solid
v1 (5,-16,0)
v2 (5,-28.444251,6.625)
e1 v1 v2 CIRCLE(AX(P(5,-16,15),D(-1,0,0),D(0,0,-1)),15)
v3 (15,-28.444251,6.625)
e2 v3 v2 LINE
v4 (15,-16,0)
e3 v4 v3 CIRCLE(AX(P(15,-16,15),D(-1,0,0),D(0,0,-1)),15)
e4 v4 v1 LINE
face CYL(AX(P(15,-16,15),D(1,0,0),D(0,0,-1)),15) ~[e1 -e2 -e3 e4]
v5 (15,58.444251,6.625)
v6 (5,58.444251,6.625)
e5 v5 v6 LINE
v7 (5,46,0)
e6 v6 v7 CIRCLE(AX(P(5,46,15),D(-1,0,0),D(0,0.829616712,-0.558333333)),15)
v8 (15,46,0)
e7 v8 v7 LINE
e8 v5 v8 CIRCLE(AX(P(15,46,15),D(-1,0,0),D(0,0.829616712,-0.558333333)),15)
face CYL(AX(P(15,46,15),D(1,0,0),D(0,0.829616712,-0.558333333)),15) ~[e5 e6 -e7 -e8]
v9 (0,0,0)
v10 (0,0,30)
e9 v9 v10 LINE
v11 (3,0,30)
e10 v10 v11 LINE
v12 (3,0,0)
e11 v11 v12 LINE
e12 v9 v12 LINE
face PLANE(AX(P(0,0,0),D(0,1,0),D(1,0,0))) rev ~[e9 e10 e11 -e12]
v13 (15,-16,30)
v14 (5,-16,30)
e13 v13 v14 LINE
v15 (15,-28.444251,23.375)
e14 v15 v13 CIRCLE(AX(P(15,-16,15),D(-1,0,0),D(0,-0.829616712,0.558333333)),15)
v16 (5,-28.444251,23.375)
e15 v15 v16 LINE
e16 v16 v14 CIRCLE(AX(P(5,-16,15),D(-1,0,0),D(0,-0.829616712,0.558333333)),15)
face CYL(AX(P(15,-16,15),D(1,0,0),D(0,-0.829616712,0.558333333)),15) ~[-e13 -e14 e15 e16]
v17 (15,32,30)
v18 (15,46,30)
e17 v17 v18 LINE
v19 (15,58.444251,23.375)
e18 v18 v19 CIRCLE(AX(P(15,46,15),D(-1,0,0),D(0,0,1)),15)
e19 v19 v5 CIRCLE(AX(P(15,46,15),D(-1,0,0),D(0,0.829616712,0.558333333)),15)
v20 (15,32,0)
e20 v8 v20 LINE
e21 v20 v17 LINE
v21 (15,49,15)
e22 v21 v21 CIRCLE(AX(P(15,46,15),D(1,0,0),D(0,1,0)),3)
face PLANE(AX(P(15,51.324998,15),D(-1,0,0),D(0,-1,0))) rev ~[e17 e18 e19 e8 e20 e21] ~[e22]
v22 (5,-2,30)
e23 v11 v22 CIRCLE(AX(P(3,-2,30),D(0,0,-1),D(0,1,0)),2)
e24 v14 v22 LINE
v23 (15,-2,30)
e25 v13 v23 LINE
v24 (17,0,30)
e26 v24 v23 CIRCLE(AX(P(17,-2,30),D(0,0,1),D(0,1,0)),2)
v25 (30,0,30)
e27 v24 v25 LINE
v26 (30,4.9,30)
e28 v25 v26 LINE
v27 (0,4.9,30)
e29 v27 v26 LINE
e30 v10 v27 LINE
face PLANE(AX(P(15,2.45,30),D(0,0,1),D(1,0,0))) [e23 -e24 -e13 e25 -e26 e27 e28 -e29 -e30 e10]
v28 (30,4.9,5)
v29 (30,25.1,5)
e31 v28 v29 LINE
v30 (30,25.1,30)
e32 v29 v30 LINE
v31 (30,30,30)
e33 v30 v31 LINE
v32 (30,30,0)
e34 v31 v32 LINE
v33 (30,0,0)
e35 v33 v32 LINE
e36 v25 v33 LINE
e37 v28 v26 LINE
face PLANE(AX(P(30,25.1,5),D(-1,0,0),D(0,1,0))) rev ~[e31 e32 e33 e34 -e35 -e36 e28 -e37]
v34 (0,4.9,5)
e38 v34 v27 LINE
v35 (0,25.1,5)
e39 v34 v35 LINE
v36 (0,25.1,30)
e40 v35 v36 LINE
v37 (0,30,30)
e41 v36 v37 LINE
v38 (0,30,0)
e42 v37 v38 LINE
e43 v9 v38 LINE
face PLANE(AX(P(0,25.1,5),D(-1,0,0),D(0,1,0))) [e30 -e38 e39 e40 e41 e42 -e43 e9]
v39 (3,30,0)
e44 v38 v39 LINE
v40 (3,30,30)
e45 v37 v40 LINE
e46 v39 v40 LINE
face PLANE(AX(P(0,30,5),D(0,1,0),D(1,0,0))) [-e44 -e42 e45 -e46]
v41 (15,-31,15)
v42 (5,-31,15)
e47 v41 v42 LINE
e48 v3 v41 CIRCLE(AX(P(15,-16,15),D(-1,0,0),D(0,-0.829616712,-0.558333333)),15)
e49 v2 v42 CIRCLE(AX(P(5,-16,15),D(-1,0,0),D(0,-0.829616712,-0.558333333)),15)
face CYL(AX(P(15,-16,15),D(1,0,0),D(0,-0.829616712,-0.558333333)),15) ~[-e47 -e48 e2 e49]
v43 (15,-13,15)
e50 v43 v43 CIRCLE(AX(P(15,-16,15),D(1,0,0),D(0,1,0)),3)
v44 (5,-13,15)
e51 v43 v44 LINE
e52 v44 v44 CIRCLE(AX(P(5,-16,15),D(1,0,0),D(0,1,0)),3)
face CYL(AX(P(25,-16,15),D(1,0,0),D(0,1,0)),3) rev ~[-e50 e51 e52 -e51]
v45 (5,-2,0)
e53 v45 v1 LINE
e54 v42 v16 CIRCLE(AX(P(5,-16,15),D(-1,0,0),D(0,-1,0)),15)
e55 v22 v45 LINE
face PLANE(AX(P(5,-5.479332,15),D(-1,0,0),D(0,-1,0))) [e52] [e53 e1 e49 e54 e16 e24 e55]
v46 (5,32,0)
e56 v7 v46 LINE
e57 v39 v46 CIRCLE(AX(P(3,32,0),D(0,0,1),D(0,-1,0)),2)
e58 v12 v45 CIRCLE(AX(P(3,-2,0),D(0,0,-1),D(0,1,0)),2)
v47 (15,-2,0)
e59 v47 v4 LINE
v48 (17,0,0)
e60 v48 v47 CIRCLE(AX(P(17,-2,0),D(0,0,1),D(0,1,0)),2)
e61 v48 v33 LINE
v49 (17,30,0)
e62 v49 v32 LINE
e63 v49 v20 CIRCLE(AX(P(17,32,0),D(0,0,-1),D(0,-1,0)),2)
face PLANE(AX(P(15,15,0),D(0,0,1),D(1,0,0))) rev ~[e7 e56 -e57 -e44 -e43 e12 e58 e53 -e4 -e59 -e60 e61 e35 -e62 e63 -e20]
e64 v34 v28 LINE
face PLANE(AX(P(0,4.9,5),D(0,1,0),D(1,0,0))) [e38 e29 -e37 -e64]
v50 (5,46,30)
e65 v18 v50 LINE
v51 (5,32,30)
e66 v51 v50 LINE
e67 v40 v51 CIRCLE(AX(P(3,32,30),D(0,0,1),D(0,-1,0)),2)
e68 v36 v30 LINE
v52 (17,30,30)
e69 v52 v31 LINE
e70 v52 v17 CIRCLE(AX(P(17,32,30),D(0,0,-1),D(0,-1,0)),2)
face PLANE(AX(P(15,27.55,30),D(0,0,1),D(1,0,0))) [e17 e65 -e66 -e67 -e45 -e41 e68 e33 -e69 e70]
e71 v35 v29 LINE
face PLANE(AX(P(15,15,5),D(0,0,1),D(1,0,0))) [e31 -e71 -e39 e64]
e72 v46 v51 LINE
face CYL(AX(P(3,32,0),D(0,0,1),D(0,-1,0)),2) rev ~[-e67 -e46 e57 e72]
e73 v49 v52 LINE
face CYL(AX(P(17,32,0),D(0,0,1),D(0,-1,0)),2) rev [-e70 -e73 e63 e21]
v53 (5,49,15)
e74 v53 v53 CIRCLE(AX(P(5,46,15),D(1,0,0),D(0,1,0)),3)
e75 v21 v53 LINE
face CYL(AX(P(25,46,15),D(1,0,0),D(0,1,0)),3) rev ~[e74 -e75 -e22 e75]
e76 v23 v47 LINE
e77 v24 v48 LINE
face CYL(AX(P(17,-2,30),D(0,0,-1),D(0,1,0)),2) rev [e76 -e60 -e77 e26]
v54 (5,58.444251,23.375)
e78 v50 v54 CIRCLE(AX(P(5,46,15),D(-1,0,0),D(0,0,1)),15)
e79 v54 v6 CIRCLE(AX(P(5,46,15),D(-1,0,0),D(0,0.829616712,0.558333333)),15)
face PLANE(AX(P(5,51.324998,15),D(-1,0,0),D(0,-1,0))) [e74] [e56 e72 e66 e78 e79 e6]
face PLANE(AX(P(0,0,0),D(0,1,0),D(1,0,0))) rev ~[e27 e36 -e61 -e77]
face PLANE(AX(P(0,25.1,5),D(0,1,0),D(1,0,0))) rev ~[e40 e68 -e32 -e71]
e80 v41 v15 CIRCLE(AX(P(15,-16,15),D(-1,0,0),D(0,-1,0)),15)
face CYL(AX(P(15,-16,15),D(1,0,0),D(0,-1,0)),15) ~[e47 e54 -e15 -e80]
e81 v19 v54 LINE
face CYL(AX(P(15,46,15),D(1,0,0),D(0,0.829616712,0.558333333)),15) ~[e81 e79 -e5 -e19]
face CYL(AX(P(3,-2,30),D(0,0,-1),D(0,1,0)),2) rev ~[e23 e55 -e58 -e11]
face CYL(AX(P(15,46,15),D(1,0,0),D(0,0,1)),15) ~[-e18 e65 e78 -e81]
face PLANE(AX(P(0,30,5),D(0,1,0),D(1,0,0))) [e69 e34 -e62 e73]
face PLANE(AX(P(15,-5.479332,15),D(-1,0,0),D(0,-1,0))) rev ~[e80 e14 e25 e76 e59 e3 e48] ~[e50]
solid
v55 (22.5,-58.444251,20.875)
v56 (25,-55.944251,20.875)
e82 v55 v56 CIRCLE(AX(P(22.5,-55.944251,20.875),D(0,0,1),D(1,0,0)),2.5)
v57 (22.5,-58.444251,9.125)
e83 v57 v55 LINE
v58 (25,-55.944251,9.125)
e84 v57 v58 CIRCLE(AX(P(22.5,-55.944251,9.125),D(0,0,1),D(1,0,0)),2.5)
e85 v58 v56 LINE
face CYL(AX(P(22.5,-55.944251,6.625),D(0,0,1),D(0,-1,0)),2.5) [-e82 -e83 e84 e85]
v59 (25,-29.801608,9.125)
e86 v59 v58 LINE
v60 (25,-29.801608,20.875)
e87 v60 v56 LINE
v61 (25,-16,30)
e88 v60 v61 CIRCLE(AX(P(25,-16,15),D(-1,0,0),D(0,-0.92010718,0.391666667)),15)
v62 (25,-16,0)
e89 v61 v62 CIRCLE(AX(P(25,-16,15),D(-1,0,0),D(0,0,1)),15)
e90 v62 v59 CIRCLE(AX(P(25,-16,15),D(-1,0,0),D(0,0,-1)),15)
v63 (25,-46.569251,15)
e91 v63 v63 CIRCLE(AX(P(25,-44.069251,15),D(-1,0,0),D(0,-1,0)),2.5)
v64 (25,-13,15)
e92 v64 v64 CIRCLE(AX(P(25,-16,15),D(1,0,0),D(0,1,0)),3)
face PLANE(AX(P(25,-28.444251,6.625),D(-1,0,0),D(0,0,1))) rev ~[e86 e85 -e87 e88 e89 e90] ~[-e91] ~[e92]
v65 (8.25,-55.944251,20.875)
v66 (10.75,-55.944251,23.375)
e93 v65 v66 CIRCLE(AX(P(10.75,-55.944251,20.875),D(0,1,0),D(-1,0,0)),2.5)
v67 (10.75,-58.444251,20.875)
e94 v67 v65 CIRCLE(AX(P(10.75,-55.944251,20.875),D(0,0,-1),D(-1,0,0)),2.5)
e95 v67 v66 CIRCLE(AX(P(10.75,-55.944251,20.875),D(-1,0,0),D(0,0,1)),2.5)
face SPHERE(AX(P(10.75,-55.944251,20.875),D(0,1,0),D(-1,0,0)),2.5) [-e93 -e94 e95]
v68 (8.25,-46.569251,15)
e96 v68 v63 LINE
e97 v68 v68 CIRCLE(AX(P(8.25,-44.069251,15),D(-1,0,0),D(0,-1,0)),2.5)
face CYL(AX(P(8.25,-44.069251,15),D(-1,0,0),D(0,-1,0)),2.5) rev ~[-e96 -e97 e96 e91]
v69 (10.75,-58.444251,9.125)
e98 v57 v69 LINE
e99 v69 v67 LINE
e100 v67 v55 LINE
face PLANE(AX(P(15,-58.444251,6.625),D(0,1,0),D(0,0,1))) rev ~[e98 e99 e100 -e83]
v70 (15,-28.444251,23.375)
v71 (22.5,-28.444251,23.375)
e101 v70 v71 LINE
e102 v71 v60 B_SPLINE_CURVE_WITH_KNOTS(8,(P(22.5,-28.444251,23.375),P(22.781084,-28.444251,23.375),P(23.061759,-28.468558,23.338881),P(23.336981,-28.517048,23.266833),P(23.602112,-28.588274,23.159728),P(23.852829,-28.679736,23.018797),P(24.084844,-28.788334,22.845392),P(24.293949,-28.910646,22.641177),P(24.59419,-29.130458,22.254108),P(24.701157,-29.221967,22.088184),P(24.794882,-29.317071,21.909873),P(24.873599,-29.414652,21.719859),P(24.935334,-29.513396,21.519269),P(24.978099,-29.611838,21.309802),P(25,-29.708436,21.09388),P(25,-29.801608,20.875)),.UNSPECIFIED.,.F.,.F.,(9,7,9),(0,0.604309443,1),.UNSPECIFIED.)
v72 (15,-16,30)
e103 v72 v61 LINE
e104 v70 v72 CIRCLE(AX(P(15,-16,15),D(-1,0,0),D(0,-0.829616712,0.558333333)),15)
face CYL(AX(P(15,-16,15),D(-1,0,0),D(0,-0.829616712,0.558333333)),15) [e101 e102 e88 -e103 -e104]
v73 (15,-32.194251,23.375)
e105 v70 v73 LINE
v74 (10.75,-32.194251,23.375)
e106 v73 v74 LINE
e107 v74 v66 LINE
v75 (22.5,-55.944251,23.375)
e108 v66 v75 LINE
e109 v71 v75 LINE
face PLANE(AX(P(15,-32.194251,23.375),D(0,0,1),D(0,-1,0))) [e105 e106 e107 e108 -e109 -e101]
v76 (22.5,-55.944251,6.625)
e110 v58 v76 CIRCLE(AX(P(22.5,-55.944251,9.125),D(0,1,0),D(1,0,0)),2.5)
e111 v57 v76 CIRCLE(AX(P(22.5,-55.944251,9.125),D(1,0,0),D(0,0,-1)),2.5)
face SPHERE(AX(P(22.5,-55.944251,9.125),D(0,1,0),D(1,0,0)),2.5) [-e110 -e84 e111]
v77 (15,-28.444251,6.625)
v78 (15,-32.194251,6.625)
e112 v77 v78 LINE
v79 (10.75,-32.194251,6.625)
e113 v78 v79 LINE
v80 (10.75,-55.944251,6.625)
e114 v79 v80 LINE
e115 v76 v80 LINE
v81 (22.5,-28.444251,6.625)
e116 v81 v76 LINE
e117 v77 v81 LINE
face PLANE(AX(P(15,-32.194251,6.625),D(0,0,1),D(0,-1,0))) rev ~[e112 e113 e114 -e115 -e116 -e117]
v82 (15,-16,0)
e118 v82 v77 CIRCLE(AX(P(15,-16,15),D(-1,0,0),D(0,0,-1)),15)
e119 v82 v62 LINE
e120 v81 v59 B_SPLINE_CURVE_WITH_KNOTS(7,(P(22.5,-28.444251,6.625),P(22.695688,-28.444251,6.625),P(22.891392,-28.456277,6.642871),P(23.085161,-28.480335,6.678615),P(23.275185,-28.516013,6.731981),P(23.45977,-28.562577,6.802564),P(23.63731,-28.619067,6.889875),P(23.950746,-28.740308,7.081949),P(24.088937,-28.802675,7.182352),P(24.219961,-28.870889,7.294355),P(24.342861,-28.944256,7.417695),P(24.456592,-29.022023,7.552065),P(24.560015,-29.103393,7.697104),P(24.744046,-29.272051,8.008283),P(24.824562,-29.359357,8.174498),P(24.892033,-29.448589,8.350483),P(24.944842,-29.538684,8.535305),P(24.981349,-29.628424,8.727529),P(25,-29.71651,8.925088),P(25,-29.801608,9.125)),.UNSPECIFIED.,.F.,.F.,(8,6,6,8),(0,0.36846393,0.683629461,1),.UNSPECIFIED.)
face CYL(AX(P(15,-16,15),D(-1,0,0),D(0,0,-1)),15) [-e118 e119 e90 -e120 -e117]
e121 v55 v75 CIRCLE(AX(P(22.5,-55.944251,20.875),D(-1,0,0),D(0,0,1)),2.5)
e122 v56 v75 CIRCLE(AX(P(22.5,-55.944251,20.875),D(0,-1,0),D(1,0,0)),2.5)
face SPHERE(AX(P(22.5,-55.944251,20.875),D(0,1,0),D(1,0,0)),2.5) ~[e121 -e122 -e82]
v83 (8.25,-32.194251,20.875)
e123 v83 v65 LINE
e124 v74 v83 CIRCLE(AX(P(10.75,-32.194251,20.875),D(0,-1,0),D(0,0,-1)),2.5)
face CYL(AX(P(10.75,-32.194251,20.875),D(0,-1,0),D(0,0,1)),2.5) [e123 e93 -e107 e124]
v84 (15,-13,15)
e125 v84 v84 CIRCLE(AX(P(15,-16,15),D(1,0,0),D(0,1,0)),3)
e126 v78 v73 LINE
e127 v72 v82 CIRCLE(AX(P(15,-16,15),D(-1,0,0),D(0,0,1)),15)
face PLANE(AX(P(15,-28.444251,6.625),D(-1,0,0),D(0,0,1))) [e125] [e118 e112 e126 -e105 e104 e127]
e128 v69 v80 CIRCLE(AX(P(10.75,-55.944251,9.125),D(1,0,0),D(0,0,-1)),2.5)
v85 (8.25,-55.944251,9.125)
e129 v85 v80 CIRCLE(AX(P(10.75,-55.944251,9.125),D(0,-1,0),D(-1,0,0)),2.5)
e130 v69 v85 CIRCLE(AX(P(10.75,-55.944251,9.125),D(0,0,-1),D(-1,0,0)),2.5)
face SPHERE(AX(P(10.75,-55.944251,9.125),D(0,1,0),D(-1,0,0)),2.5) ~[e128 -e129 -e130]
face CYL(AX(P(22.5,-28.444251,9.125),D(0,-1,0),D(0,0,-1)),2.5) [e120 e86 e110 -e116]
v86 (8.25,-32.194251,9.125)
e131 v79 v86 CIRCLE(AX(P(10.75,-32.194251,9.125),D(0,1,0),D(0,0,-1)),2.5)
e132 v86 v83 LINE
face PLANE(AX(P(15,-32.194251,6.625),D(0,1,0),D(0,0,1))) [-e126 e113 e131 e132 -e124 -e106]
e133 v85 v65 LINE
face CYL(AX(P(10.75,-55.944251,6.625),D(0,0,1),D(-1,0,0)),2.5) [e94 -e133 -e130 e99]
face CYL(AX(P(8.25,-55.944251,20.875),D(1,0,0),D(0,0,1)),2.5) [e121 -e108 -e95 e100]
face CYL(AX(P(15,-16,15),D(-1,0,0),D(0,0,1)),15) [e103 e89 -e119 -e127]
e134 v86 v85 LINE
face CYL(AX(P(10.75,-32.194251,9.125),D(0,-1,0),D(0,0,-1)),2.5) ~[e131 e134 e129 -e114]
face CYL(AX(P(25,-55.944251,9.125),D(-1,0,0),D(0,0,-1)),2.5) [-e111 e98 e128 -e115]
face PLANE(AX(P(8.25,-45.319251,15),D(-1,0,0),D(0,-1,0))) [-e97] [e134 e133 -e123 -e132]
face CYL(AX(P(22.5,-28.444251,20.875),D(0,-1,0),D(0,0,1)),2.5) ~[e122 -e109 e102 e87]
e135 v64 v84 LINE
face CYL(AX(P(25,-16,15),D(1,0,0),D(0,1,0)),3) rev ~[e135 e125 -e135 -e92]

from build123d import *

# Parameters (mm, degrees)
F1_W      = 30
F1_H      = 30
F2_DEPTH  = 5
F3_W      = 30
F3_H      = 4.9
F4_DEPTH  = 25
F8_DEPTH  = 10
F9_R      = 2
F10_DEPTH = 10
F11_DEPTH = 30
F12_W     = 26.25
F12_H     = 16.75
F13_DEPTH = 6.75
F14_R     = 3
F15_DEPTH = 25
F16_R     = 2.5
F17_R     = 2.5
F18_DEPTH = 16.75


with BuildPart() as f2:
    # F1 (on Top) → F2 (new body)
    with BuildSketch(Plane.XY):
        with Locations((15, 15)):
            Rectangle(F1_W, F1_H)
    extrude(amount=F2_DEPTH)

    # F3 (on face) → F4 (join)
    with BuildSketch(Plane.XY.offset(5)):
        with Locations((15, 27.55)):
            Rectangle(F3_W, F3_H)
        with Locations((15, 2.45)):
            Rectangle(F3_W, F3_H)
    extrude(amount=F4_DEPTH)

    # F7 (on line) → F8 (join)
    with BuildSketch(Plane(origin=(15, 0, 0), x_dir=(0, -1, 0), z_dir=(-1, 0, 0))):
        with BuildLine():
            Line((16, 30), (0, 30))
            Line((0, 30), (0, 0))
            Line((0, 0), (16, 0))
            ThreePointArc((16, 0), (1, 15), (16, 30))
        make_face()
        with BuildLine():
            ThreePointArc((28.4442506805, 23.375), (23.0489360899, 28.2405626769), (16, 30))
            Line((16, 30), (16, 23))
            Line((16, 23), (16, 7))
            Line((16, 7), (16, 0))
            ThreePointArc((16, 0), (23.0489360899, 1.7594373231), (28.4442506805, 6.625))
            Line((28.4442506805, 6.625), (28.4442506805, 23.375))
        make_face()
        with BuildLine():
            Line((16, 23), (16, 30))
            ThreePointArc((16, 30), (1, 15), (16, 0))
            Line((16, 0), (16, 7))
            Line((16, 7), (16, 23))
        make_face()
        with BuildLine():
            ThreePointArc((31, 15), (30.3468421649, 19.3781411462), (28.4442506805, 23.375))
            Line((28.4442506805, 23.375), (28.4442506805, 6.625))
            ThreePointArc((28.4442506805, 6.625), (30.3468421649, 10.6218588538), (31, 15))
        make_face()
        with BuildLine():
            Line((-46, 0), (-46, 30))
            ThreePointArc((-46, 30), (-53.0489360899, 28.2405626769), (-58.4442506805, 23.375))
            Line((-58.4442506805, 23.375), (-58.4442506805, 6.625))
            ThreePointArc((-58.4442506805, 6.625), (-53.0489360899, 1.7594373231), (-46, 0))
        make_face()
        with BuildLine():
            ThreePointArc((-31, 15), (-35.3933982822, 25.6066017178), (-46, 30))
            Line((-46, 30), (-46, 0))
            ThreePointArc((-46, 0), (-35.3933982822, 4.3933982822), (-31, 15))
        make_face()
        with BuildLine():
            Line((-30, 0), (-30, 30))
            Line((-30, 30), (-46, 30))
            ThreePointArc((-46, 30), (-35.3933982822, 25.6066017178), (-31, 15))
            ThreePointArc((-31, 15), (-35.3933982822, 4.3933982822), (-46, 0))
            Line((-46, 0), (-30, 0))
        make_face()
        with BuildLine():
            Line((-58.4442506805, 6.625), (-58.4442506805, 23.375))
            ThreePointArc((-58.4442506805, 23.375), (-61, 15), (-58.4442506805, 6.625))
        make_face()
    extrude(amount=F8_DEPTH)

    # F9
    f9_edges = [f2.edges().sort_by_distance(p)[0] for p in [
        (5, 0, 15),
        (15, 0, 15),
        (5, 30, 15),
        (15, 30, 15),
    ]]
    fillet(f9_edges, radius=F9_R)


with BuildPart() as f10:
    # F7 (on line) → F10 (new body)
    with BuildSketch(Plane(origin=(15, 0, 0), x_dir=(0, -1, 0), z_dir=(-1, 0, 0))):
        with BuildLine():
            Line((16, 23), (16, 30))
            ThreePointArc((16, 30), (1, 15), (16, 0))
            Line((16, 0), (16, 7))
            Line((16, 7), (16, 23))
        make_face()
        with BuildLine():
            ThreePointArc((28.4442506805, 23.375), (23.0489360899, 28.2405626769), (16, 30))
            Line((16, 30), (16, 23))
            Line((16, 23), (16, 7))
            Line((16, 7), (16, 0))
            ThreePointArc((16, 0), (23.0489360899, 1.7594373231), (28.4442506805, 6.625))
            Line((28.4442506805, 6.625), (28.4442506805, 23.375))
        make_face()
    extrude(amount=-F10_DEPTH)

    # F11 (add): a face of the model
    f11_faces = [f10.faces().sort_by_distance(p)[0] for p in [
        (20, -28.4442506805, 15),
    ]]
    extrude(f11_faces, amount=F11_DEPTH)

    # F12 (on face) → F13 (join)
    with BuildSketch(Plane(origin=(15, 0, 0), x_dir=(0, -1, 0), z_dir=(-1, 0, 0))):
        with Locations((45.3192506805, 15)):
            Rectangle(F12_W, F12_H)
    extrude(amount=F13_DEPTH)


with BuildPart() as f15_tool:
    # F14 (on face) → F15 (new body)
    with BuildSketch(Plane.YZ.offset(25)):
        with Locations((-16, 15)):
            Circle(F14_R)
        with Locations((46, 15)):
            Circle(F14_R)
    extrude(amount=-F15_DEPTH)


with BuildPart() as f2_1:
    add(f2.part)

    # F15: cut by f15_tool
    add(f15_tool.part, mode=Mode.SUBTRACT)


with BuildPart() as f10_1:
    add(f10.part)

    # F15: cut by f15_tool
    add(f15_tool.part, mode=Mode.SUBTRACT)

    # F16
    f16_edges = [f10_1.edges().sort_by_distance(p)[0] for p in [
        (8.25, -45.319251, 23.375),
        (8.25, -45.319251, 6.625),
        (25, -43.444251, 23.375),
        (25, -43.444251, 6.625),
        (25, -58.444251, 15),
        (8.25, -58.444251, 15),
        (16.625, -58.444251, 6.625),
        (16.625, -58.444251, 23.375),
    ]]
    fillet(f16_edges, radius=F16_R)

    # F17 (on face) → F18 (cut, through all)
    with BuildSketch(Plane(origin=(8.25, 0, 0), x_dir=(0, -1, 0), z_dir=(-1, 0, 0))):
        with Locations((44.0692506805, 15)):
            Circle(F17_R)
    extrude(amount=-F18_DEPTH, mode=Mode.SUBTRACT)


solid = Compound([f2_1.part, f10_1.part])
